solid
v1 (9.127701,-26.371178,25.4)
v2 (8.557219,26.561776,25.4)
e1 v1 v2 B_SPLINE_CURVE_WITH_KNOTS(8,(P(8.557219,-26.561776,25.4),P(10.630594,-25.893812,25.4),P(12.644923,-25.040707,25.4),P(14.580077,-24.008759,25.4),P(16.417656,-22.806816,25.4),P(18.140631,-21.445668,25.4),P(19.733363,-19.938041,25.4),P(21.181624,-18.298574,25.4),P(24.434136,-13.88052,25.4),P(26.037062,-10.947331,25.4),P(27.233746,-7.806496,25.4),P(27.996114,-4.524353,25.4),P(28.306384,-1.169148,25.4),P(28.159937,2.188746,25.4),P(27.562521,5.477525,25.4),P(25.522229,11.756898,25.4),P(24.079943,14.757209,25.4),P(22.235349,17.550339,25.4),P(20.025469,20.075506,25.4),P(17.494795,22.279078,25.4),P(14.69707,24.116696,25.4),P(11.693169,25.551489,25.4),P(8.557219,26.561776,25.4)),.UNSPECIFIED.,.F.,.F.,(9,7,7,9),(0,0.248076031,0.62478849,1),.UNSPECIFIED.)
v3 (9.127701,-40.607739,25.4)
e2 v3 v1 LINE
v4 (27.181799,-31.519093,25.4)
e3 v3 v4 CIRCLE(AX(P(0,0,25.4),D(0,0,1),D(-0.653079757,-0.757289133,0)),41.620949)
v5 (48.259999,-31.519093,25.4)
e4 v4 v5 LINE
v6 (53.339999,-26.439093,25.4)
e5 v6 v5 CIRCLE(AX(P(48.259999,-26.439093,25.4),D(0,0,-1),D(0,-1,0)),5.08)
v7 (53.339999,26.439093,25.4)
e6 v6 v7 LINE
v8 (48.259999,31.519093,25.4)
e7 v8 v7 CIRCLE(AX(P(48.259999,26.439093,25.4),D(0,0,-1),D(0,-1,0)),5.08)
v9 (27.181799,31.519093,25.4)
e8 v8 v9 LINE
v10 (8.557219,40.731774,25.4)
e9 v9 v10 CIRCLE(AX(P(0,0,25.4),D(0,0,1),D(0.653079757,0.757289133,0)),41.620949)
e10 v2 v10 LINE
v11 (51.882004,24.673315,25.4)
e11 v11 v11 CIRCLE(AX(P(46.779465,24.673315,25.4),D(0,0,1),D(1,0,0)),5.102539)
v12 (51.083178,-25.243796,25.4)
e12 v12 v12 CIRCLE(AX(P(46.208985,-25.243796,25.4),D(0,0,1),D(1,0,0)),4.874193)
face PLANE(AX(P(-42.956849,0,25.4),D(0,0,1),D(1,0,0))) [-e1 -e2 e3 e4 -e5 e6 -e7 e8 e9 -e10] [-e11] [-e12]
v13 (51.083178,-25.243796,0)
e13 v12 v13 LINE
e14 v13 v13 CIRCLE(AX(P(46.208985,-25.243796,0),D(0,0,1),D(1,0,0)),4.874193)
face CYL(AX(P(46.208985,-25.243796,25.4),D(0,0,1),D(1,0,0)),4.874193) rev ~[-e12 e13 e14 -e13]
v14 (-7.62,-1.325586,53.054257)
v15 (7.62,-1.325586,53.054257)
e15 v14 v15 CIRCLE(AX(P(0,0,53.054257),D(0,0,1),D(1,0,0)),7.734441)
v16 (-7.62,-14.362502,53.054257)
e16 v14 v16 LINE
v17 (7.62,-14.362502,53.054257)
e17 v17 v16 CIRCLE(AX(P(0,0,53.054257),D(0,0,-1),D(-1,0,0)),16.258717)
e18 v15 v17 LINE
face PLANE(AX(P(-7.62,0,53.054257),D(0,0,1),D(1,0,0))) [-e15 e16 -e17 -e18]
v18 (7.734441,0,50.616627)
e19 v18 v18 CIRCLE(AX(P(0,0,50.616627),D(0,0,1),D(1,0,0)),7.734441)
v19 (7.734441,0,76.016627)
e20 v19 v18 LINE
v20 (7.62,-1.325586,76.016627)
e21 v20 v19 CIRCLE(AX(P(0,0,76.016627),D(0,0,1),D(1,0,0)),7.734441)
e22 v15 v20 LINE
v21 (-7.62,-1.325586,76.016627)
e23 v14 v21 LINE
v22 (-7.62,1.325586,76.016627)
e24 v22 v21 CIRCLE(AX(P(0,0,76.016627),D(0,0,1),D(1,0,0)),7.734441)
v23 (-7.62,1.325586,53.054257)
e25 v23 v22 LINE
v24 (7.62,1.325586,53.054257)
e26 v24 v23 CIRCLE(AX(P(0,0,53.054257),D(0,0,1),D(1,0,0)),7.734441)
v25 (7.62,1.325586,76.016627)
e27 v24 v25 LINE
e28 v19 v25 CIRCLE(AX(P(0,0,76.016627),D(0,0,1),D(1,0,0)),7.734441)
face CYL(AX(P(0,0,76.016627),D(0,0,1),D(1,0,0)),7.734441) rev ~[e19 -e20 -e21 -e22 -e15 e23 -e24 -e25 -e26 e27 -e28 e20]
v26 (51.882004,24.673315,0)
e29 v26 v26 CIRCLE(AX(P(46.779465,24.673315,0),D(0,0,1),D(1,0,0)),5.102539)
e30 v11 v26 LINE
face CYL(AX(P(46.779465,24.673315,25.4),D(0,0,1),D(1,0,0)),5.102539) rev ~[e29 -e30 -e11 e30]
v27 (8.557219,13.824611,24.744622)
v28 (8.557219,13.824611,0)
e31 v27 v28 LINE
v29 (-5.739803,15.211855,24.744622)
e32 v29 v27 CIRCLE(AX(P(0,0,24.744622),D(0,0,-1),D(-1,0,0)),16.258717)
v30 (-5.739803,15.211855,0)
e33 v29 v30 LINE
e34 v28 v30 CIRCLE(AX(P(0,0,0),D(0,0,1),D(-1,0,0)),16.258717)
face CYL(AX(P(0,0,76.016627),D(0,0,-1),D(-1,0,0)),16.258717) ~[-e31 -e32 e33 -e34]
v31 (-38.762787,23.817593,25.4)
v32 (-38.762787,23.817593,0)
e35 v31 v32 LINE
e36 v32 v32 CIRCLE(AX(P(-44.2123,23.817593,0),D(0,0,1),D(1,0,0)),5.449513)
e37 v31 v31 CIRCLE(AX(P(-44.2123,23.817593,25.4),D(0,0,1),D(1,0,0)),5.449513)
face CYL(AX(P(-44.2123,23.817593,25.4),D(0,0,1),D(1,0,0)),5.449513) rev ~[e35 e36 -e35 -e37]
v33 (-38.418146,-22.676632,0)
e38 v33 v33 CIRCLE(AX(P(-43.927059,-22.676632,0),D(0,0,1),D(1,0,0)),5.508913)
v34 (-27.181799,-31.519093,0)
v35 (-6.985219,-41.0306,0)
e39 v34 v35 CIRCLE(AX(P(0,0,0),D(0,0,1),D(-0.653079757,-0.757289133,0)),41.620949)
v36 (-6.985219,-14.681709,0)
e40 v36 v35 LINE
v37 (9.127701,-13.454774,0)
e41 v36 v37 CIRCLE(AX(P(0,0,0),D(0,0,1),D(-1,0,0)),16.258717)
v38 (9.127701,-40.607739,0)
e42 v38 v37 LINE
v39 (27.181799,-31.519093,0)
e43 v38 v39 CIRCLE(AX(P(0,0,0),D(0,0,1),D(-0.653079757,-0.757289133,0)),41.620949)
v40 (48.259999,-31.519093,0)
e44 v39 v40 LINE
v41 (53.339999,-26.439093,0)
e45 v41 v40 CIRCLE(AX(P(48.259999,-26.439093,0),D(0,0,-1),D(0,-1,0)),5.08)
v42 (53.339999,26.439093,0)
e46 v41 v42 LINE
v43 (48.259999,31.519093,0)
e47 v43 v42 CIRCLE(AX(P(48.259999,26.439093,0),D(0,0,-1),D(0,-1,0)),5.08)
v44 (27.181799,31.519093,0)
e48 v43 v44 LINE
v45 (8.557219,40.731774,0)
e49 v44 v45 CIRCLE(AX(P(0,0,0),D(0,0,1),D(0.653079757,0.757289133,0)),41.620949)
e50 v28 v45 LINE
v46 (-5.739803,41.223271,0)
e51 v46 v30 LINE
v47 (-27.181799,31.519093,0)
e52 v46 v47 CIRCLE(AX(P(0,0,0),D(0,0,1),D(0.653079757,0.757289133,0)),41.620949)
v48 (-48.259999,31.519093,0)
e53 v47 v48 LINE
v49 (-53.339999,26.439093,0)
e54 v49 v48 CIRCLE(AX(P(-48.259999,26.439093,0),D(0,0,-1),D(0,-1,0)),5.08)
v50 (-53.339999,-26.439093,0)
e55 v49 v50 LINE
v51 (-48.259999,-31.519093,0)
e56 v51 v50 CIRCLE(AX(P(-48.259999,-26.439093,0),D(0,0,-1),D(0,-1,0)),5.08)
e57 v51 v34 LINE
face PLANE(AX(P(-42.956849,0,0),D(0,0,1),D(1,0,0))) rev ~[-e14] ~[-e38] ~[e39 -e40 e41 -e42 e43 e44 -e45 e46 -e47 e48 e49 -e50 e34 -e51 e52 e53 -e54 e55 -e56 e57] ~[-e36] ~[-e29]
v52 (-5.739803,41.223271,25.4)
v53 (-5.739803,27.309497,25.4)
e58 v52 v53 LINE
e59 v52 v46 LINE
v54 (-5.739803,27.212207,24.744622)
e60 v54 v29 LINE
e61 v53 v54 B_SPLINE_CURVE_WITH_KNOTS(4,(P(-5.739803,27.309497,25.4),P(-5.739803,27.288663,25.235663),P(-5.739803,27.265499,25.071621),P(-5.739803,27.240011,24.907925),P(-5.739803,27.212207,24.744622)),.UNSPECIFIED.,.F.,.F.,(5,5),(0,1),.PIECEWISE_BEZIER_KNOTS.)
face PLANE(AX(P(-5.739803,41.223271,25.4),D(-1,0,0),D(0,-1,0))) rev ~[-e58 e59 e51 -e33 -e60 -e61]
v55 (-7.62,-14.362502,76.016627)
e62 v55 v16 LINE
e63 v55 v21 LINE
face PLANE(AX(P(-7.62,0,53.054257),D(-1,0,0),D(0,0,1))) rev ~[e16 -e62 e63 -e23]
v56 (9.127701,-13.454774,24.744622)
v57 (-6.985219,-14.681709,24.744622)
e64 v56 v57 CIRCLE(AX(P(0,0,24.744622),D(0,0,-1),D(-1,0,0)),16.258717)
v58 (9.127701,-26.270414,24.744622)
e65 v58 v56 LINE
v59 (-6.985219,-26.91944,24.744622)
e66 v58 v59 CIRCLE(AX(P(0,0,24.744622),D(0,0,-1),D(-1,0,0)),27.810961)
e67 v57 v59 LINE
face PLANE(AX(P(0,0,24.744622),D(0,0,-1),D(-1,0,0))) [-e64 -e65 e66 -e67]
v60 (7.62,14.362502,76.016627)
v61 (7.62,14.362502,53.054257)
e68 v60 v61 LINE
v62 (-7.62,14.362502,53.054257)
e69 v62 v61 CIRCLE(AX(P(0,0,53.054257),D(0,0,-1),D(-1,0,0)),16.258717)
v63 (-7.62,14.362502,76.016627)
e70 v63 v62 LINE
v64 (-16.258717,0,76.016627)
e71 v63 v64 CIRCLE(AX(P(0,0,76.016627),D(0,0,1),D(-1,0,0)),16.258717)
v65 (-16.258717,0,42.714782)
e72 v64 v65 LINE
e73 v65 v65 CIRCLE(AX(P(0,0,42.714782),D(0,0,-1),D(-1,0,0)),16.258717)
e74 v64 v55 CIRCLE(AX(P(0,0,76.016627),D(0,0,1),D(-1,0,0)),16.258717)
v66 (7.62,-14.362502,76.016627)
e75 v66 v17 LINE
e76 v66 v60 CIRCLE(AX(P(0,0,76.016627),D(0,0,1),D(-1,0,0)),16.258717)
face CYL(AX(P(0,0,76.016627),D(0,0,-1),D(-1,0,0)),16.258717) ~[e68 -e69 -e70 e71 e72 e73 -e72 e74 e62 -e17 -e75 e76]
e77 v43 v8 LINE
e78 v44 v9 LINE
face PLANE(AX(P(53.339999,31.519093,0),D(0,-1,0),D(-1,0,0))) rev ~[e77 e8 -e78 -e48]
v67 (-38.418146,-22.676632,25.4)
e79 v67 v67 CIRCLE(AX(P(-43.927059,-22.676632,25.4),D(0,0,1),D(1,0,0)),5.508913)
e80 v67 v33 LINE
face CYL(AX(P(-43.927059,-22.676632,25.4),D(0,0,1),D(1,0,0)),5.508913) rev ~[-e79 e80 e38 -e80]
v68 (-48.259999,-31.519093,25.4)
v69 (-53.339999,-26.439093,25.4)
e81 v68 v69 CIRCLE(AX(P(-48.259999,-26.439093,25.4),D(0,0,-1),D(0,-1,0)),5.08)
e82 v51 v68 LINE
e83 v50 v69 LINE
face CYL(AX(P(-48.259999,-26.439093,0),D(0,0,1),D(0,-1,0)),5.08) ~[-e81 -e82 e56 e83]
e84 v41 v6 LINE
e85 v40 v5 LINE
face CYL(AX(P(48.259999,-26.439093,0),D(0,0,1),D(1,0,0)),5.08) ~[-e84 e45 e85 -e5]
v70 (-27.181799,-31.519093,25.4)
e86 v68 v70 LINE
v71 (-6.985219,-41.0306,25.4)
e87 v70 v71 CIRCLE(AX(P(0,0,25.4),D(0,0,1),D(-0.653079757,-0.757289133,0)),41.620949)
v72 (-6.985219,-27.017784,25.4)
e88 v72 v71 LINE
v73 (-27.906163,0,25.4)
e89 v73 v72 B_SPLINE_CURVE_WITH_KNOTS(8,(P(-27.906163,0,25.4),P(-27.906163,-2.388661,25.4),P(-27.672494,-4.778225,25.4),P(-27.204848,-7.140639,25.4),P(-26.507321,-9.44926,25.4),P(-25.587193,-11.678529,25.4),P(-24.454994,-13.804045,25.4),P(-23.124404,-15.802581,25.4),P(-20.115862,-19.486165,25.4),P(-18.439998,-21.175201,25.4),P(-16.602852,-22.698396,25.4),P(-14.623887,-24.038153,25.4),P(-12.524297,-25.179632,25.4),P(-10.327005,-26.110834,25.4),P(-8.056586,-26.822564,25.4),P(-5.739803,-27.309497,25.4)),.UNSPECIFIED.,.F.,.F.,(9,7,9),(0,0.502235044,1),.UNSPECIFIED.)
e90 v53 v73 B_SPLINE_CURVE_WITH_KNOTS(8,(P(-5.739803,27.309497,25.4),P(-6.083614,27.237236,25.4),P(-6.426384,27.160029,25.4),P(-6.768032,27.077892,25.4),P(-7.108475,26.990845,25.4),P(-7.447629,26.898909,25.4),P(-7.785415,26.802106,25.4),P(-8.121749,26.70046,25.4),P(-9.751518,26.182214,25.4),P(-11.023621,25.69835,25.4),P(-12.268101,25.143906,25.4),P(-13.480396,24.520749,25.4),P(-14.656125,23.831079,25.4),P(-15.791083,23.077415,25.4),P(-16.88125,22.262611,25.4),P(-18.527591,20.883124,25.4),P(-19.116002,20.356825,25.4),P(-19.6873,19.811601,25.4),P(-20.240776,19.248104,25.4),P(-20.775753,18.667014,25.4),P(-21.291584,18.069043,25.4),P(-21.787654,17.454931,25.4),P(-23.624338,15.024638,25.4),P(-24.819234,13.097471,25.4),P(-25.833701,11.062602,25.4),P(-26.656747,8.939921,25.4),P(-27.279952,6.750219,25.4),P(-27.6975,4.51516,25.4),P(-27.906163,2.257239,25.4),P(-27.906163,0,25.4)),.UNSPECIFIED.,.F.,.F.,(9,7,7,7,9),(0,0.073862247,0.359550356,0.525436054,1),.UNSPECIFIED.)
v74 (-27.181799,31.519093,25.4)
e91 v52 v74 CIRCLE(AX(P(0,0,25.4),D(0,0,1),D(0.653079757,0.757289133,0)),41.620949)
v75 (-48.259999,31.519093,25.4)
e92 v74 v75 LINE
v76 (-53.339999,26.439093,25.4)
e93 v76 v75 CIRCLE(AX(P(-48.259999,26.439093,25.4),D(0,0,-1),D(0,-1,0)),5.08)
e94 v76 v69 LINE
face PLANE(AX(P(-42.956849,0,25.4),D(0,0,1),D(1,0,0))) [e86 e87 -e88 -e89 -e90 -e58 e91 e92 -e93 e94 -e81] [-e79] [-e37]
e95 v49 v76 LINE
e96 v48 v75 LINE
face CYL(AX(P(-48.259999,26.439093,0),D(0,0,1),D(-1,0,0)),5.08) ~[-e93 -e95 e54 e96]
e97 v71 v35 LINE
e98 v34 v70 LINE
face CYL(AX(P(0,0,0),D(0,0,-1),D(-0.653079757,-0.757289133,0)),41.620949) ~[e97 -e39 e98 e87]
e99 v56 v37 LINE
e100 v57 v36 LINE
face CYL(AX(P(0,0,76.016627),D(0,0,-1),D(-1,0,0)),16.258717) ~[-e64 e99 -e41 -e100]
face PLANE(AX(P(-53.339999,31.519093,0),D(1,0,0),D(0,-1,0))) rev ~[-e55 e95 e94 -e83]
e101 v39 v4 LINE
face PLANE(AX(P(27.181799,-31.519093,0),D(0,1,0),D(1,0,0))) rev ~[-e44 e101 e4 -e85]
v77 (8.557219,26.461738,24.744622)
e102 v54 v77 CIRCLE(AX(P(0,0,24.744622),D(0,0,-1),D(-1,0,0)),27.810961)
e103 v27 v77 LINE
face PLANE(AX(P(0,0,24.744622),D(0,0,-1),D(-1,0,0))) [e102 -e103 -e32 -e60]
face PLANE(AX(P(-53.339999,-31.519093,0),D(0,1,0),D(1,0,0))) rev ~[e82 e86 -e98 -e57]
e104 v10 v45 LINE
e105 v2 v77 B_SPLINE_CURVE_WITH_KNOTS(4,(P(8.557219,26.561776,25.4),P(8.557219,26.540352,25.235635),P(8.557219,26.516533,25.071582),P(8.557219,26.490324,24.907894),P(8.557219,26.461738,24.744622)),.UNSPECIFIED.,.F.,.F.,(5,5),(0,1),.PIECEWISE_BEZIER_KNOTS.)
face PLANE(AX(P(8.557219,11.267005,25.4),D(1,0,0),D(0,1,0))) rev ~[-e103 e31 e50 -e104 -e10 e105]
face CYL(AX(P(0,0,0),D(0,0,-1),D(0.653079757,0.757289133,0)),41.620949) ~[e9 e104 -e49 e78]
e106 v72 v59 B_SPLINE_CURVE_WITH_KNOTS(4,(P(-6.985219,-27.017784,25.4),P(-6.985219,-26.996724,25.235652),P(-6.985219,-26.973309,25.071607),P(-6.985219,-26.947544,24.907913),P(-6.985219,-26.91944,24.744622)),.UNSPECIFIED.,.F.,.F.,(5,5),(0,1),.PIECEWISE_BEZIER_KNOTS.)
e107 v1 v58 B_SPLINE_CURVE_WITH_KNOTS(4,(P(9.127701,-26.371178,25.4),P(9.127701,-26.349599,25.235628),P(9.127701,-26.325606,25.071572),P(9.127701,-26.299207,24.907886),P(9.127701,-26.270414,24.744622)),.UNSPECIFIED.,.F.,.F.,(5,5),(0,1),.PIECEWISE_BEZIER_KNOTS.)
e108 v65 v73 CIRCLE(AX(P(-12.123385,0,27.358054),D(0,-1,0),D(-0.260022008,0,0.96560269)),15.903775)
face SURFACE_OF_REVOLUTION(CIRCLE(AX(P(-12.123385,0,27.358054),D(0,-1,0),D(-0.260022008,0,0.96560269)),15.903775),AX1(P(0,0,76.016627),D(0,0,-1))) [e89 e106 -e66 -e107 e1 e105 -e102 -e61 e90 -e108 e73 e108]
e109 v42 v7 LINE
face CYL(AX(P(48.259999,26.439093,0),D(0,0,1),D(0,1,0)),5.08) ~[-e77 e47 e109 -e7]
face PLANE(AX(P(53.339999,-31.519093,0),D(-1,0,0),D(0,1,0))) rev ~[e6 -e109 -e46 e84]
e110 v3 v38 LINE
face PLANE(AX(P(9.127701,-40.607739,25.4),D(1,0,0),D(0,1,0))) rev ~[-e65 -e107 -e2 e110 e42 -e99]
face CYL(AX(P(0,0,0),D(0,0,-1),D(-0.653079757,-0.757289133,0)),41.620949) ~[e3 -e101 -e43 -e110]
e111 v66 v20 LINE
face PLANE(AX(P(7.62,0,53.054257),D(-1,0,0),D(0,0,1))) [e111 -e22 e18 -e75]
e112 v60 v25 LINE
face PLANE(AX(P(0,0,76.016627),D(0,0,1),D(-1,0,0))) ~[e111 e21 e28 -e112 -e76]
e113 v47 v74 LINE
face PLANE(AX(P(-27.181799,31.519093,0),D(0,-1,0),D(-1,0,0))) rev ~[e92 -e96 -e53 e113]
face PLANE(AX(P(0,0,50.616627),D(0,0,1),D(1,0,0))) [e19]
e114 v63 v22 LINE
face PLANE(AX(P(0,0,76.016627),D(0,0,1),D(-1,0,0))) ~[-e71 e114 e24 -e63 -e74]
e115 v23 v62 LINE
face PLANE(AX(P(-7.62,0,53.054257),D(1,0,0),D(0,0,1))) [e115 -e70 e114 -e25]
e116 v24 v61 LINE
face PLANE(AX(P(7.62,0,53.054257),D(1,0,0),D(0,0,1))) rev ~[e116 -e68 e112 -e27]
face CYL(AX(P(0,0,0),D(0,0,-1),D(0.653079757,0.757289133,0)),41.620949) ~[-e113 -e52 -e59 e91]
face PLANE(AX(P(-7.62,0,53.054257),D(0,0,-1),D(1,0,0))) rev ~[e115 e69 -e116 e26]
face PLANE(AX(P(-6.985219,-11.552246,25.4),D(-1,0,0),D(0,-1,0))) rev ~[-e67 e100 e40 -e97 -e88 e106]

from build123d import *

# Parameters (mm, degrees)
F1_DEPTH       = 25.4
F2_R           = 5.4495134178
F2_R_2         = 5.5089125438
F3_DEPTH       = 25.4
F4_R           = 5.1025387704
F4_R_2         = 4.874193153
F5_DEPTH       = 25.4
F7_DEPTH       = 25.4
F9_DEPTH       = 25.4
F10_R          = 5.08
F15_R          = 7.7344411216
F16_DEPTH      = 25.4
F17_W          = 15.24
F17_H          = 33.801519665
F18_DEPTH      = 25.4
F18_DEPTH_BACK = 25.4


# Not quite as in the source:
# - a feature of the source that left no trace in its solid (it failed there, or was rolled back) is left out


with BuildPart() as f1:
    # F0 (on Top) → F1 (new body)
    with BuildSketch(Plane.XY):
        with BuildLine():
            Line((-53.3399991691, -31.5190926194), (-27.1817994649, -31.5190926194))
            ThreePointArc((-27.1817994649, -31.5190926194), (-41.6209493128, 0), (-27.1817994649, 31.5190926194))
            Line((-27.1817994649, 31.5190926194), (-53.3399991691, 31.5190926194))
            Line((-53.3399991691, 31.5190926194), (-53.3399991691, -31.5190926194))
        make_face()
        with BuildLine():
            Line((27.1817994649, -31.5190926194), (53.3399991691, -31.5190926194))
            Line((53.3399991691, -31.5190926194), (53.3399991691, 31.5190926194))
            Line((53.3399991691, 31.5190926194), (27.1817994649, 31.5190926194))
            ThreePointArc((27.1817994649, 31.5190926194), (37.8393691772, 17.3345193752), (41.6209493128, 0))
            ThreePointArc((41.6209493128, 0), (37.8393691772, -17.3345193752), (27.1817994649, -31.5190926194))
        make_face()
        with BuildLine():
            ThreePointArc((-27.1817994649, -31.5190926194), (0, -41.6209493128), (27.1817994649, -31.5190926194))
            Line((27.1817994649, -31.5190926194), (-27.1817994649, -31.5190926194))
        make_face()
        with BuildLine():
            Line((-27.1817994649, 31.5190926194), (27.1817994649, 31.5190926194))
            ThreePointArc((27.1817994649, 31.5190926194), (0, 41.6209493128), (-27.1817994649, 31.5190926194))
        make_face()
        with BuildLine():
            Line((-27.1817994649, -31.5190926194), (27.1817994649, -31.5190926194))
            ThreePointArc((27.1817994649, -31.5190926194), (37.8393691772, -17.3345193752), (41.6209493128, 0))
            ThreePointArc((41.6209493128, 0), (37.8393691772, 17.3345193752), (27.1817994649, 31.5190926194))
            Line((27.1817994649, 31.5190926194), (-27.1817994649, 31.5190926194))
            ThreePointArc((-27.1817994649, 31.5190926194), (-41.6209493128, 0), (-27.1817994649, -31.5190926194))
        make_face()
    extrude(amount=F1_DEPTH)

    # F2 (on face) → F3 (cut)
    with BuildSketch(Plane.XY.offset(25.4)):
        with Locations((-44.2123003304, 23.8175932318)):
            Circle(F2_R)
        with Locations((-43.9270585775, -22.6766318083)):
            Circle(F2_R_2)
    extrude(amount=-F3_DEPTH, mode=Mode.SUBTRACT)

    # F4 (on face) → F5 (cut)
    with BuildSketch(Plane.XY.offset(25.4)):
        with Locations((46.7794649303, 24.6733147651)):
            Circle(F4_R)
        with Locations((46.2089851499, -25.2437964082)):
            Circle(F4_R_2)
    extrude(amount=-F5_DEPTH, mode=Mode.SUBTRACT)

    # F6 (on face) → F7 (cut)
    with BuildSketch(Plane.XY.offset(25.4)):
        with BuildLine():
            Line((-6.9852194627, -11.5522462875), (-6.9852194627, -41.0305999317))
            Line((-6.9852194627, -41.0305999317), (6.9852194627, -41.0305999317))
            ThreePointArc((6.9852194627, -41.0305999317), (8.0592339465, -40.8332238489), (9.1277007014, -40.6077394299))
            Line((9.1277007014, -40.6077394299), (9.1277007014, -11.5522462875))
            Line((9.1277007014, -11.5522462875), (-6.9852194627, -11.5522462875))
        make_face()
        with BuildLine():
            Line((6.9852194627, -41.0305999317), (-6.9852194627, -41.0305999317))
            ThreePointArc((-6.9852194627, -41.0305999317), (0, -41.6209493128), (6.9852194627, -41.0305999317))
        make_face()
        with BuildLine():
            Line((5.7398033244, 41.2232710917), (-5.7398033244, 41.2232710917))
            Line((-5.7398033244, 41.2232710917), (-5.7398033244, 11.2670054659))
            Line((-5.7398033244, 11.2670054659), (8.5572190583, 11.2670054659))
            Line((8.5572190583, 11.2670054659), (8.5572190583, 40.7317741289))
            ThreePointArc((8.5572190583, 40.7317741289), (7.1527340625, 41.0017294407), (5.7398033244, 41.2232710917))
        make_face()
    extrude(amount=-F7_DEPTH, mode=Mode.SUBTRACT)

    # F9 (cut): a face of the model
    f9_faces = [f1.faces().sort_by_distance(p)[0] for p in [
        (0, 41.2232710917, 12.7),
    ]]
    extrude(f9_faces, amount=-F9_DEPTH, mode=Mode.SUBTRACT)

    # F10
    f10_edges = [f1.edges().sort_by_distance(p)[0] for p in [
        (53.339999, -31.519093, 12.7),
        (53.339999, 31.519093, 12.7),
        (-53.339999, -31.519093, 12.7),
        (-53.339999, 31.519093, 12.7),
    ]]
    fillet(f10_edges, radius=F10_R)

    # F11 (on Front) → F12 (revolve)
    with BuildSketch(Plane.XZ):
        Polygon((-16.2587165833, 0), (0, 0), (0, 76.0166272521), (-16.2587165833, 76.0166272521), (-16.2587165833, 42.7147820592), (-16.2587165833, 24.7446224093), align=None)
    revolve(axis=Axis((0, 0, 38.0083136261), (0, 0, 1)))

    # F11 (on Front) → F13 (revolve)
    with BuildSketch(Plane.XZ):
        Polygon((-16.2587165833, 0), (0, 0), (0, 76.0166272521), (-16.2587165833, 76.0166272521), (-16.2587165833, 42.7147820592), (-16.2587165833, 24.7446224093), align=None)
        with BuildLine():
            Line((-27.8109610081, 24.7446224093), (-16.2587165833, 24.7446224093))
            Line((-16.2587165833, 24.7446224093), (-16.2587165833, 42.7147820592))
            ThreePointArc((-16.2587165833, 42.7147820592), (-25.501298739, 35.958140564), (-27.8109610081, 24.7446224093))
        make_face()
    revolve(axis=Axis((0, 0, 76.0166272521), (0, 0, -1)))

    # F15 (on face) → F16 (cut)
    with BuildSketch(Plane.XY.offset(76.0166272521)):
        Circle(F15_R)
    extrude(amount=-F16_DEPTH, mode=Mode.SUBTRACT)

    # F17 (on Front) → F18 (cut, two sides)
    with BuildSketch(Plane.XZ) as f18_sk:
        with Locations((0, 69.9550167755)):
            Rectangle(F17_W, F17_H)
    extrude(amount=-F18_DEPTH, mode=Mode.SUBTRACT)
    extrude(f18_sk.sketch, amount=F18_DEPTH_BACK, mode=Mode.SUBTRACT)


solid = f1.part
